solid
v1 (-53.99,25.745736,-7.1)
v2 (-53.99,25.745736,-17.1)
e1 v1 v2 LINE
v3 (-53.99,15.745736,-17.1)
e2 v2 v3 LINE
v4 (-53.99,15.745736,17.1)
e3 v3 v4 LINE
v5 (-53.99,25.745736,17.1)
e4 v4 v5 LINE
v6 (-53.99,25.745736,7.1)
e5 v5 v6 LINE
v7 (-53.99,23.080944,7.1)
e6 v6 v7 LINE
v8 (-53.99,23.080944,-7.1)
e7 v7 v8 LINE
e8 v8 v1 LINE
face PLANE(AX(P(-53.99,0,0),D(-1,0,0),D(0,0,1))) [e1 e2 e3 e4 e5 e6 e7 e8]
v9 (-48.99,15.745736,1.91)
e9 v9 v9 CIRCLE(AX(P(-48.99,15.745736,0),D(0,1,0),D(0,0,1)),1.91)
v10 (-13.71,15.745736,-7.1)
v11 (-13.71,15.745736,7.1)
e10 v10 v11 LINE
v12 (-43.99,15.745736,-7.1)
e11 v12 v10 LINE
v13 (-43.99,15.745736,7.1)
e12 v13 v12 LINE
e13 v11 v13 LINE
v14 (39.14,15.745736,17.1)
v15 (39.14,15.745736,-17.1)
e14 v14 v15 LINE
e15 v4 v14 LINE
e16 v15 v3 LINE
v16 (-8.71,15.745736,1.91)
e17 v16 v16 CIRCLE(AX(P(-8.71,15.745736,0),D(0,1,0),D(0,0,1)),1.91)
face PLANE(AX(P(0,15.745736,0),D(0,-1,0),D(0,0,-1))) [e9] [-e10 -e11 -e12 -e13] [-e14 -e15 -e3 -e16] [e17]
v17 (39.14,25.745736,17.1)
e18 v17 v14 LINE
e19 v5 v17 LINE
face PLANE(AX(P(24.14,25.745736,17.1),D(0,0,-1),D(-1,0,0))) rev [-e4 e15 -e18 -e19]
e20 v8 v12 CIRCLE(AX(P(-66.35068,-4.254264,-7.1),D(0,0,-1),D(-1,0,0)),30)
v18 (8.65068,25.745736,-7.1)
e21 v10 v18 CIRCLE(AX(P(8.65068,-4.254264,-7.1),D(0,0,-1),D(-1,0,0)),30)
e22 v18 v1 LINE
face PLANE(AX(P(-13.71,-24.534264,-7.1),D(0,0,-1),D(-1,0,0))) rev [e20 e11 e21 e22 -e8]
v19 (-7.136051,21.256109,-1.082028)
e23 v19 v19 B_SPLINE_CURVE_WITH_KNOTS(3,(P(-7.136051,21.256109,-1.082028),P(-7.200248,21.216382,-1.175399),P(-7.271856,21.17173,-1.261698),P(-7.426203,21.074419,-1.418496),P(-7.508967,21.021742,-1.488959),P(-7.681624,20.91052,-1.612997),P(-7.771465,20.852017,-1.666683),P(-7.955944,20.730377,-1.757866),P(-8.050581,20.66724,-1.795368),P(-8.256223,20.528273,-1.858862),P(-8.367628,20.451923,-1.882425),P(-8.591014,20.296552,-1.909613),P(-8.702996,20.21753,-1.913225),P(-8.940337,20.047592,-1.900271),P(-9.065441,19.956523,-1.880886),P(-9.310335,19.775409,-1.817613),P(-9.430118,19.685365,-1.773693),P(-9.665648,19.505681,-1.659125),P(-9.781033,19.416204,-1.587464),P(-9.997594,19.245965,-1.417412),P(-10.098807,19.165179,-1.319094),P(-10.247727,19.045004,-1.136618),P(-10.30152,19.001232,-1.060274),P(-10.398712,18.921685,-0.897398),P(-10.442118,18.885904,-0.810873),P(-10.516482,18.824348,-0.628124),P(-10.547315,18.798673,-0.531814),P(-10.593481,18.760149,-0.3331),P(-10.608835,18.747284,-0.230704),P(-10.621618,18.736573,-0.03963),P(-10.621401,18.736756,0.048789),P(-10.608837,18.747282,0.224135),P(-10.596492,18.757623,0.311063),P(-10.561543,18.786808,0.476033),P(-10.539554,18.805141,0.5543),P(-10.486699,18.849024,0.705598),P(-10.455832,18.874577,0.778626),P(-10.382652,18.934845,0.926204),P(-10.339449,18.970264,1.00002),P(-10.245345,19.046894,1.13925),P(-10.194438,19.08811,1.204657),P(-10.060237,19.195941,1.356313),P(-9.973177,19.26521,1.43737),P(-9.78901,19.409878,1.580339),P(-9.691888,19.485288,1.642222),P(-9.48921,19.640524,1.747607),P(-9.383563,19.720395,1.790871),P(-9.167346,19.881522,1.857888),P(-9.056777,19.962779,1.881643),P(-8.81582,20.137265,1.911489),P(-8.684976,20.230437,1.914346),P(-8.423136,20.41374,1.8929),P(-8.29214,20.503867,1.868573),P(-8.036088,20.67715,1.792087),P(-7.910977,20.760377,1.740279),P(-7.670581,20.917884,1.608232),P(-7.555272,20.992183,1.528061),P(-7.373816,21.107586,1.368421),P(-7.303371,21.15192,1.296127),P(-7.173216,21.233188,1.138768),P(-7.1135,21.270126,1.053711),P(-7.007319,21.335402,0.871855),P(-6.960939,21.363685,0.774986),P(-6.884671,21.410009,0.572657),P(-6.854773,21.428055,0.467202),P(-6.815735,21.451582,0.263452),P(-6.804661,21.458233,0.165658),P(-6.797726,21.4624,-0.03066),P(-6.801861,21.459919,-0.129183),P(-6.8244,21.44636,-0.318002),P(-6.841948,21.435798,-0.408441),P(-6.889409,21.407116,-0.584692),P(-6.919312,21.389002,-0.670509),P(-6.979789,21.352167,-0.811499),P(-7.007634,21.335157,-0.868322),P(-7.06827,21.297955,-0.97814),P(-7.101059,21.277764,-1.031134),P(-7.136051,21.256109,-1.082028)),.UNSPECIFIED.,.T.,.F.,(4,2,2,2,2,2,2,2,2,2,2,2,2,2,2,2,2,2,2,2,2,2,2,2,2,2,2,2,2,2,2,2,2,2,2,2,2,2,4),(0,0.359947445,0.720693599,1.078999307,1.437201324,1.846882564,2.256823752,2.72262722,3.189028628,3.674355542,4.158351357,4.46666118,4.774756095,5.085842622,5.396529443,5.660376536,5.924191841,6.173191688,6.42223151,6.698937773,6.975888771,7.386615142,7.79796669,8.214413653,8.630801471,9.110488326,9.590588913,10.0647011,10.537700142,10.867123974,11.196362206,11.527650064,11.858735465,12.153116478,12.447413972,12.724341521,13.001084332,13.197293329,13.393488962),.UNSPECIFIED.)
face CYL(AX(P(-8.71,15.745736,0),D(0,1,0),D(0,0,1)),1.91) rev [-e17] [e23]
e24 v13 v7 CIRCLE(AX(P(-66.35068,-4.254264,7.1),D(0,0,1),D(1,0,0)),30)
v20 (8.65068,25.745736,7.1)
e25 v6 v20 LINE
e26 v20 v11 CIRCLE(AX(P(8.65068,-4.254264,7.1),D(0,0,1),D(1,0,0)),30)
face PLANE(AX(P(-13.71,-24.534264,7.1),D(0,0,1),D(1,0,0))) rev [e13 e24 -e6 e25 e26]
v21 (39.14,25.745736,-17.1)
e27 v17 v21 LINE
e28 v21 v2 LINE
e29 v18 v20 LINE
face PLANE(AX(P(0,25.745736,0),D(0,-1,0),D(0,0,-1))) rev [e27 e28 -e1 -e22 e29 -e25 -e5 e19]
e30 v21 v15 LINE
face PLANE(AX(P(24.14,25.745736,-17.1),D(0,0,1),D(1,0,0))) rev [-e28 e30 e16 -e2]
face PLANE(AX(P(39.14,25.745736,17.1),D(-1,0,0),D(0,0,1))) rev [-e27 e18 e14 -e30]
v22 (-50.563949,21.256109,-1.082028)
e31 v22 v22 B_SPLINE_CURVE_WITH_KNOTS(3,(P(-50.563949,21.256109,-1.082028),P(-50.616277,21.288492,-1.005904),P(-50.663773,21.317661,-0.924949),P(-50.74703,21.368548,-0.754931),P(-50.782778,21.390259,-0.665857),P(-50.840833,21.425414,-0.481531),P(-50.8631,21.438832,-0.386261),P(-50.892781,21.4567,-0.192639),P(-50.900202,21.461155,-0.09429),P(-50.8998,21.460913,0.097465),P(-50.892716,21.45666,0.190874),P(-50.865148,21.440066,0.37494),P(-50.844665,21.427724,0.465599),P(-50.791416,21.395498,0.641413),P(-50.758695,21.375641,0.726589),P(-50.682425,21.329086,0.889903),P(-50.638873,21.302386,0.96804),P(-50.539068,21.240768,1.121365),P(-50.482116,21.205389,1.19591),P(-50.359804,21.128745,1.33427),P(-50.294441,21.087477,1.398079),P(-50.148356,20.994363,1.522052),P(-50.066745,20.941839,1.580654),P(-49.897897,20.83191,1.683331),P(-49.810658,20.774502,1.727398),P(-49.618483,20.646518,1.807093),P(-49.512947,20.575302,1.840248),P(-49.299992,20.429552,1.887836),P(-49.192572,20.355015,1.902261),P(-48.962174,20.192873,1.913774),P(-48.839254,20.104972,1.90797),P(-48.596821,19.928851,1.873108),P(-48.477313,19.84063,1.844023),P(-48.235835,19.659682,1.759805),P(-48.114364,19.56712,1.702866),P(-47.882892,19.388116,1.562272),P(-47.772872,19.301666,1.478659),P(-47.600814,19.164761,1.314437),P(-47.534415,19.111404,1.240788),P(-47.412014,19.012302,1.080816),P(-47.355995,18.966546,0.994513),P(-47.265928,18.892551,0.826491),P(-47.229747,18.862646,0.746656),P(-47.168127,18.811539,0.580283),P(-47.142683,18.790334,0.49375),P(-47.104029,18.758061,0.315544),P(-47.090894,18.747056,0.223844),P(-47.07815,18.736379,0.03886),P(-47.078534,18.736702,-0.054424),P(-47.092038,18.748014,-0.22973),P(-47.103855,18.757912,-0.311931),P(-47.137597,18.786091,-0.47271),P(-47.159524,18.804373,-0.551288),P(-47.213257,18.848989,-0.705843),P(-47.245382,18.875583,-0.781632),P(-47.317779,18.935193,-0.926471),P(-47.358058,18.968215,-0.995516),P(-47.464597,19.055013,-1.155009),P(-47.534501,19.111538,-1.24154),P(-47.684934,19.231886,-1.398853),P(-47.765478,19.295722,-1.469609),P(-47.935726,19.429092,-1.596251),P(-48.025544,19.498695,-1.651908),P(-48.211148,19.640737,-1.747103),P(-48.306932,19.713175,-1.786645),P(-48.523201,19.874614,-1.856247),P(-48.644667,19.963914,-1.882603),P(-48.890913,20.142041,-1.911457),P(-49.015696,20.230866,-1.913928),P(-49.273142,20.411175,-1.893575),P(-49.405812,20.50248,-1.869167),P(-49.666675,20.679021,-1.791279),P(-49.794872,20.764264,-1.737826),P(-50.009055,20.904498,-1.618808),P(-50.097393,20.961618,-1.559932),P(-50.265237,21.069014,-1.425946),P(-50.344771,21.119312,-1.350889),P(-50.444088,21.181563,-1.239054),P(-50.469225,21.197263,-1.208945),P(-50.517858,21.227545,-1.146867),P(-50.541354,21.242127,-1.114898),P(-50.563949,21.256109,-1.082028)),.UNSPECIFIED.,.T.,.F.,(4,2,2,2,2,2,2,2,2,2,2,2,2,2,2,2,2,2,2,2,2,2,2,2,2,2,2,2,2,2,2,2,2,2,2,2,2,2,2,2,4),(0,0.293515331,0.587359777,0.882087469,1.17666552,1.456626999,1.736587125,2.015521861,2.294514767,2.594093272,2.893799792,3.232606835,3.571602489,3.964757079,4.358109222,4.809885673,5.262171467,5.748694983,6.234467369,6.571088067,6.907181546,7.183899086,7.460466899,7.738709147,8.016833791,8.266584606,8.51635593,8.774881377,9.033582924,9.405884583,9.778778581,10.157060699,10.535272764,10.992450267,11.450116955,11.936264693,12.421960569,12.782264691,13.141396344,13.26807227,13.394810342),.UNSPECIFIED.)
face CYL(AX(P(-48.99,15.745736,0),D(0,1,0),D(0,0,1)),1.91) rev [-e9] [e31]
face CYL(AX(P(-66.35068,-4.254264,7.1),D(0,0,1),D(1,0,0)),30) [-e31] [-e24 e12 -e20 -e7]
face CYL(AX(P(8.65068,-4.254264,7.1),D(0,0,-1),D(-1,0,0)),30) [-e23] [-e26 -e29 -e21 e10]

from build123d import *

# Parameters (mm, degrees)
SKETCH_1_W                = 50.28
SKETCH_1_H                = 34.2
SKETCH_1_W_2              = 30.28
SKETCH_1_H_2              = 14.2
EXTRUDE_1_DEPTH           = 12.25
SKETCH_4_W                = 13
SKETCH_4_H                = 13.91
EXTRUDE_1_2_DEPTH         = 74.82
SKETCH_5_W                = 13.91
SKETCH_5_H                = 16.23
EXTRUDE_2_DEPTH           = 16
SKETCH_7_R                = 25.25
SKETCH_7_R_2              = 15.25
EXTRUDE_2_2_DEPTH         = 16.23
SKETCH_15_R               = 1.91
CUT_EXTRUDE_6_DEPTH       = 97.964478439
SKETCH_18_W               = 49.344544624
SKETCH_18_H               = 6.125
CUT_EXTRUDE_8_DEPTH       = 101.789238284
SKETCH_19_W               = 34.2
SKETCH_19_H               = 6.125
CUT_EXTRUDE_9_DEPTH       = 10
SKETCH_21_R               = 1.91
CUT_EXTRUDE_10_DEPTH      = 10
SKETCH_20_R               = 1.91
CUT_EXTRUDE_11_DEPTH      = 10
FILLET_START              = -7.1
FILLET_1_DEPTH            = 14.2
FILLET_2_DEPTH            = 14.2
SKETCH_29_W               = 13.91
SKETCH_29_H               = 74.82
EXTRUDE_5_DEPTH           = 10
SKETCH_30_W               = 10
SKETCH_30_H               = 58.59
CUT_EXTRUDE_13_DEPTH      = 97.964478439
SKETCH_32_W               = 34.2
SKETCH_32_H               = 5.745736365
EXTRUDE_6_DEPTH           = 10
CUT_EXTRUDE_16_DEPTH      = 50
CUT_EXTRUDE_16_DEPTH_BACK = 50
SKETCH_38_W               = 116.985630298
SKETCH_38_H               = 80.538350638
SKETCH_41_W               = 13.91
SKETCH_41_H               = 5.745736365
EXTRUDE_7_DEPTH           = 3
SKETCH_42_W               = 13
SKETCH_42_H               = 13.91
EXTRUDE_8_DEPTH           = 74.82
SKETCH_43_W               = 13.91
SKETCH_43_H               = 16.23
EXTRUDE_9_DEPTH           = 15.22
SKETCH_44_R               = 1.91
CUT_EXTRUDE_17_DEPTH      = 15.22
SKETCH_46_R               = 25.25
SKETCH_46_R_2             = 15.25
EXTRUDE_6_2_DEPTH         = 16.23
EXTRUDE_10_DEPTH          = 7.22
EXTRUDE_10_DEPTH_BACK     = 10
SKETCH_47_W               = 13.91
SKETCH_47_H               = 16.23
SKETCH_50_W               = 3.056753925
SKETCH_50_H               = 16.23
CUT_EXTRUDE_18_DEPTH      = 96.578211037
SKETCH_51_R               = 1.91
CUT_EXTRUDE_19_DEPTH      = 95.015226304
SKETCH_52_W               = 92.841945613
SKETCH_52_H               = 30
CUT_EXTRUDE_20_DEPTH      = 84.840694713
CUT_EXTRUDE_22_DEPTH      = 50
CUT_EXTRUDE_22_DEPTH_BACK = 50
SKETCH_53_W               = 63.541345486
SKETCH_53_H               = 14.170740414
SKETCH_54_W               = 10
SKETCH_54_H               = 10.145
CUT_EXTRUDE_23_DEPTH      = 50
SKETCH_55_W               = 13
SKETCH_55_H               = 13.91
EXTRUDE_11_DEPTH          = 10
SKETCH_57_W               = 15
SKETCH_57_H               = 34.2
EXTRUDE_12_DEPTH          = 10
SKETCH_58_W               = 34.2
SKETCH_58_H               = 10
EXTRUDE_13_DEPTH          = 27.85
SKETCH_60_W               = 34.2
SKETCH_60_H               = 10
EXTRUDE_14_DEPTH          = 50.28
SKETCH_62_W               = 30.28
SKETCH_62_H               = 14.2
CUT_EXTRUDE_24_DEPTH      = 50.28
SKETCH_64_R               = 1.91
CUT_EXTRUDE_25_DEPTH      = 10
FILLET_3_R                = 30
CUT_EXTRUDE_27_DEPTH      = 40
CUT_EXTRUDE_27_DEPTH_BACK = 40
SKETCH_69_W               = 103.83153819
SKETCH_69_H               = 99.848427979


with BuildPart() as part:
    # 草圖1 → Extrude 1 (new body)
    with BuildSketch(Plane(origin=(0, 0, 0), x_dir=(1, 0, 0), z_dir=(0, 1, 0))):
        Rectangle(SKETCH_1_W, SKETCH_1_H)
        Rectangle(SKETCH_1_W_2, SKETCH_1_H_2, mode=Mode.SUBTRACT)
    extrude(amount=EXTRUDE_1_DEPTH)

    # 草圖4 → Extrude 1 2 (add)
    with BuildSketch(Plane.XZ):
        with Locations((18.64, 0)):
            Rectangle(SKETCH_4_W, SKETCH_4_H)
    extrude(amount=EXTRUDE_1_2_DEPTH)

    # 草圖5 → Extrude 2 (add)
    with BuildSketch(Plane.ZY.offset(-12.14)):
        with Locations((0, -66.705)):
            Rectangle(SKETCH_5_W, SKETCH_5_H)
    extrude(amount=EXTRUDE_2_DEPTH)

    # 草圖7 → Extrude 2 2 (add)
    with BuildSketch(Plane(origin=(3.626674765, -74.82, 0), x_dir=(1, 0, 0), z_dir=(0, -1, 0))):
        with Locations((-30.978154344, 0)):
            Circle(SKETCH_7_R)
        with Locations((-30.978154344, 0)):
            Circle(SKETCH_7_R_2, mode=Mode.SUBTRACT)
    extrude(amount=-EXTRUDE_2_2_DEPTH)

    # 草圖15 → 除料-伸長6 (cut, through all)
    with BuildSketch(Plane(origin=(0, 0, -6.955), x_dir=(-1, 0, 0), z_dir=(0, 0, -1))):
        with Locations((-4.530883248, -66.705)):
            Circle(SKETCH_15_R)
    extrude(amount=-CUT_EXTRUDE_6_DEPTH, mode=Mode.SUBTRACT)

    # 草圖18 → 除料-伸長8 (cut, through all)
    with BuildSketch(Plane(origin=(0, 0, -17.1), x_dir=(-1, 0, 0), z_dir=(0, 0, -1))):
        with Locations((0.467727688, 9.1875)):
            Rectangle(SKETCH_18_W, SKETCH_18_H)
    extrude(amount=-CUT_EXTRUDE_8_DEPTH, mode=Mode.SUBTRACT)

    # 草圖19 → 除料-伸長9 (cut)
    with BuildSketch(Plane.ZY.offset(-24.204544624)):
        with Locations((0, 9.1875)):
            Rectangle(SKETCH_19_W, SKETCH_19_H)
    extrude(amount=-CUT_EXTRUDE_9_DEPTH, mode=Mode.SUBTRACT)

    # 草圖21 → 除料-伸長10 (cut)
    with BuildSketch(Plane(origin=(0, 6.125, 0), x_dir=(1, 0, 0), z_dir=(0, 1, 0))):
        with Locations(Location((17.69, 0, 0), (0, 0, 270))):
            Circle(SKETCH_21_R)
    extrude(amount=-CUT_EXTRUDE_10_DEPTH, mode=Mode.SUBTRACT)

    # 草圖20 → 除料-伸長11 (cut)
    with BuildSketch(Plane(origin=(0, 6.125, 0), x_dir=(1, 0, 0), z_dir=(0, 1, 0))):
        with Locations(Location((-17.395, 0, 0), (0, 0, 270))):
            Circle(SKETCH_20_R)
    extrude(amount=-CUT_EXTRUDE_11_DEPTH, mode=Mode.SUBTRACT)

    # 圓角1: read off the stored shape, not the designer's step
    # 圓角1 outline → 圓角1 (cut)
    with BuildSketch(Plane.XY.offset(FILLET_START)):
        with BuildLine():
            add(Edge.make_bspline(
                [(-15.14, 0), (-21.974170252, 5.199829476), (-25.14, 5.745736365)],
                knots=[0, 0, 0, 0.664102345, 0.664102345, 0.664102345], degree=2, weights=[1, 2.223777218, 1.822127795]))
            Line((-15.14, 0), (-15.14, 6.125))
            Line((-15.14, 6.125), (-25.14, 6.125))
            Line((-25.14, 6.125), (-25.14, 5.745736365))
        make_face()
    extrude(amount=FILLET_1_DEPTH, mode=Mode.SUBTRACT)

    # 圓角2: read off the stored shape, not the designer's step
    # 圓角2 outline → 圓角2 (cut)
    with BuildSketch(Plane.XY.offset(FILLET_START)):
        with BuildLine():
            Line((15.14, 6.125), (15.14, 0))
            add(Edge.make_bspline(
                [(15.14, 0), (21.974170252, 5.199829476), (25.14, 5.745736365)],
                knots=[0, 0, 0, 0.664102345, 0.664102345, 0.664102345], degree=2, weights=[1, 2.223777218, 1.822127795]))
            Line((25.14, 5.745736365), (25.14, 6.125))
            Line((25.14, 6.125), (15.14, 6.125))
        make_face()
    extrude(amount=FILLET_2_DEPTH, mode=Mode.SUBTRACT)

    # 草圖29 → 填料-伸長5 (add)
    with BuildSketch(Plane(origin=(25.14, 0, 0), x_dir=(0, 0, -1), z_dir=(1, 0, 0))):
        with Locations((0, -37.41)):
            Rectangle(SKETCH_29_W, SKETCH_29_H)
    extrude(amount=EXTRUDE_5_DEPTH)

    # 草圖30 → 除料-伸長13 (cut, through all)
    with BuildSketch(Plane.XY.offset(6.955)):
        with Locations((17.14, -29.295)):
            Rectangle(SKETCH_30_W, SKETCH_30_H)
    extrude(amount=-CUT_EXTRUDE_13_DEPTH, mode=Mode.SUBTRACT)

    # 草圖32 → Extrude 6 (add)
    with BuildSketch(Plane(origin=(25.14, 0, 0), x_dir=(0, 0, -1), z_dir=(1, 0, 0))):
        with Locations((0, 2.872868182)):
            Rectangle(SKETCH_32_W, SKETCH_32_H)
    extrude(amount=EXTRUDE_6_DEPTH)

    # 草圖38 → 除料-伸長16 (cut, two sides: drawn at the far end of the back side and taken through both)
    with BuildSketch(Plane(origin=(0, 0, -6.955), x_dir=(-1, 0, 0), z_dir=(0, 0, -1)).offset(-CUT_EXTRUDE_16_DEPTH_BACK)):
        with Locations((7.268869252, -40.269175319)):
            Rectangle(SKETCH_38_W, SKETCH_38_H)
    extrude(amount=CUT_EXTRUDE_16_DEPTH + CUT_EXTRUDE_16_DEPTH_BACK, mode=Mode.SUBTRACT)

    # 草圖41 → 填料-伸長7 (add)
    with BuildSketch(Plane(origin=(35.14, 0, 0), x_dir=(0, 0, -1), z_dir=(1, 0, 0))):
        with Locations((0, 2.872868182)):
            Rectangle(SKETCH_41_W, SKETCH_41_H)
    extrude(amount=EXTRUDE_7_DEPTH)

    # 草圖42 → 填料-伸長8 (add)
    with BuildSketch(Plane(origin=(0, 0, 0), x_dir=(-1, 0, 0), z_dir=(0, -1, 0))):
        with Locations((-31.64, 0)):
            Rectangle(SKETCH_42_W, SKETCH_42_H)
    extrude(amount=EXTRUDE_8_DEPTH)

    # 草圖43 → 填料-伸長9 (add)
    with BuildSketch(Plane.ZY.offset(-25.14)):
        with Locations((0, -66.705)):
            Rectangle(SKETCH_43_W, SKETCH_43_H)
    extrude(amount=EXTRUDE_9_DEPTH)

    # 草圖44 → 除料-伸長17 (cut)
    with BuildSketch(Plane(origin=(0, 0, -6.955), x_dir=(-1, 0, 0), z_dir=(0, 0, -1))):
        with Locations(Location((-17.524895264, -66.705, 0), (0, 0, 90))):
            Circle(SKETCH_44_R)
    extrude(amount=-CUT_EXTRUDE_17_DEPTH, mode=Mode.SUBTRACT)

    # 草圖46 → Extrude 6 2 (add)
    with BuildSketch(Plane(origin=(0, -58.59, 0), x_dir=(1, 0, 0), z_dir=(0, 1, 0))):
        with Locations((-14.35, 0)):
            Circle(SKETCH_46_R)
        with Locations((-14.35, 0)):
            Circle(SKETCH_46_R_2, mode=Mode.SUBTRACT)
    extrude(amount=-EXTRUDE_6_2_DEPTH)

    # 草圖47 → 填料-伸長10 (add, two sides: drawn at the far end of the back side and taken through both)
    with BuildSketch(Plane(origin=(-40, 0, 0), x_dir=(0, 0, -1), z_dir=(1, 0, 0)).offset(-EXTRUDE_10_DEPTH_BACK)):
        with Locations((0, -66.705)):
            Rectangle(SKETCH_47_W, SKETCH_47_H)
    extrude(amount=EXTRUDE_10_DEPTH + EXTRUDE_10_DEPTH_BACK)

    # 草圖50 → 除料-伸長18 (cut, through all)
    with BuildSketch(Plane(origin=(0, 0, -6.955), x_dir=(-1, 0, 0), z_dir=(0, 0, -1))):
        with Locations((48.471623038, -66.705)):
            Rectangle(SKETCH_50_W, SKETCH_50_H)
    extrude(amount=-CUT_EXTRUDE_18_DEPTH, mode=Mode.SUBTRACT)

    # 草圖51 → 除料-伸長19 (cut, through all)
    with BuildSketch(Plane(origin=(0, 0, -6.955), x_dir=(-1, 0, 0), z_dir=(0, 0, -1))):
        with Locations((42.786508152, -66.705)):
            Circle(SKETCH_51_R)
    extrude(amount=-CUT_EXTRUDE_19_DEPTH, mode=Mode.SUBTRACT)

    # 草圖52 → 除料-伸長20 (cut, through all)
    with BuildSketch(Plane(origin=(0, -58.59, 0), x_dir=(1, 0, 0), z_dir=(0, 1, 0))):
        with Locations((-21.280972807, 15)):
            Rectangle(SKETCH_52_W, SKETCH_52_H)
    extrude(amount=-CUT_EXTRUDE_20_DEPTH, mode=Mode.SUBTRACT)

    # 草圖53 → 除料-伸長22 (cut, two sides: drawn at the far end of the back side and taken through both)
    with BuildSketch(Plane(origin=(0, 0, -6.955), x_dir=(-1, 0, 0), z_dir=(0, 0, -1)).offset(-CUT_EXTRUDE_22_DEPTH_BACK)):
        with Locations((6.630672743, -0.960370207)):
            Rectangle(SKETCH_53_W, SKETCH_53_H)
    extrude(amount=CUT_EXTRUDE_22_DEPTH + CUT_EXTRUDE_22_DEPTH_BACK, mode=Mode.SUBTRACT)

    # 草圖54 → 除料-伸長23 (cut)
    with BuildSketch(Plane(origin=(0, 5.745736365, 0), x_dir=(1, 0, 0), z_dir=(0, 1, 0))):
        with Locations((30.14, -12.0275)):
            Rectangle(SKETCH_54_W, SKETCH_54_H)
        with Locations((30.14, 12.0275)):
            Rectangle(SKETCH_54_W, SKETCH_54_H)
    extrude(amount=-CUT_EXTRUDE_23_DEPTH, mode=Mode.SUBTRACT)

    # 草圖55 → 填料-伸長11 (add)
    with BuildSketch(Plane(origin=(0, 5.745736365, 0), x_dir=(1, 0, 0), z_dir=(0, 1, 0))):
        with Locations((31.64, 0)):
            Rectangle(SKETCH_55_W, SKETCH_55_H)
    extrude(amount=EXTRUDE_11_DEPTH)

    # 草圖57 → 填料-伸長12 (add)
    with BuildSketch(Plane(origin=(0, 15.745736365, 0), x_dir=(1, 0, 0), z_dir=(0, 1, 0))):
        with Locations((31.64, 0)):
            Rectangle(SKETCH_57_W, SKETCH_57_H)
    extrude(amount=EXTRUDE_12_DEPTH)

    # 草圖58 → 填料-伸長13 (add)
    with BuildSketch(Plane.ZY.offset(-24.14)):
        with Locations((0, 20.745736365)):
            Rectangle(SKETCH_58_W, SKETCH_58_H)
    extrude(amount=EXTRUDE_13_DEPTH)

    # 草圖60 → 填料-伸長14 (add)
    with BuildSketch(Plane.ZY.offset(3.71)):
        with Locations((0, 20.745736365)):
            Rectangle(SKETCH_60_W, SKETCH_60_H)
    extrude(amount=EXTRUDE_14_DEPTH)

    # 草圖62 → 除料-伸長24 (cut)
    with BuildSketch(Plane(origin=(0, 25.745736365, 0), x_dir=(1, 0, 0), z_dir=(0, 1, 0))):
        with Locations((-28.85, 0)):
            Rectangle(SKETCH_62_W, SKETCH_62_H)
    extrude(amount=-CUT_EXTRUDE_24_DEPTH, mode=Mode.SUBTRACT)

    # 草圖64 → 除料-伸長25 (cut)
    with BuildSketch(Plane(origin=(0, 25.745736365, 0), x_dir=(1, 0, 0), z_dir=(0, 1, 0))):
        with Locations(Location((-8.71, 0, 0), (0, 0, 270))):
            Circle(SKETCH_64_R)
        with Locations(Location((-48.99, 0, 0), (0, 0, 270))):
            Circle(SKETCH_64_R)
    extrude(amount=-CUT_EXTRUDE_25_DEPTH, mode=Mode.SUBTRACT)

    # 圓角3
    # the kernel refuses this fillet: 30 mm, written as the material it takes off along each edge
    with BuildSketch(Plane(origin=(-43.99, 25.745736365, 7.1), x_dir=(-1, 0, 0), z_dir=(0, 0, -1)), Plane(origin=(-13.71, 25.745736365, -7.1), x_dir=(1, 0, 0), z_dir=(0, 0, 1))) as fillet_3_piece_1:
        with BuildLine():
            CenterArc((22.360679775, -30), FILLET_3_R, 90, 48.189685104)
            Line((0, -10), (0, 0))
            Line((0, 0), (22.360679775, 0))
        make_face()
    extrude(amount=14.2, mode=Mode.SUBTRACT)

    # 草圖69 → 除料-伸長27 (cut, two sides: drawn at the far end of the back side and taken through both)
    with BuildSketch(Plane(origin=(0, 0, 0), x_dir=(-1, 0, 0), z_dir=(0, 0, -1)).offset(-CUT_EXTRUDE_27_DEPTH_BACK)):
        with Locations((12.775769095, -34.178477625)):
            Rectangle(SKETCH_69_W, SKETCH_69_H)
    extrude(amount=CUT_EXTRUDE_27_DEPTH + CUT_EXTRUDE_27_DEPTH_BACK, mode=Mode.SUBTRACT)


solid = part.part
